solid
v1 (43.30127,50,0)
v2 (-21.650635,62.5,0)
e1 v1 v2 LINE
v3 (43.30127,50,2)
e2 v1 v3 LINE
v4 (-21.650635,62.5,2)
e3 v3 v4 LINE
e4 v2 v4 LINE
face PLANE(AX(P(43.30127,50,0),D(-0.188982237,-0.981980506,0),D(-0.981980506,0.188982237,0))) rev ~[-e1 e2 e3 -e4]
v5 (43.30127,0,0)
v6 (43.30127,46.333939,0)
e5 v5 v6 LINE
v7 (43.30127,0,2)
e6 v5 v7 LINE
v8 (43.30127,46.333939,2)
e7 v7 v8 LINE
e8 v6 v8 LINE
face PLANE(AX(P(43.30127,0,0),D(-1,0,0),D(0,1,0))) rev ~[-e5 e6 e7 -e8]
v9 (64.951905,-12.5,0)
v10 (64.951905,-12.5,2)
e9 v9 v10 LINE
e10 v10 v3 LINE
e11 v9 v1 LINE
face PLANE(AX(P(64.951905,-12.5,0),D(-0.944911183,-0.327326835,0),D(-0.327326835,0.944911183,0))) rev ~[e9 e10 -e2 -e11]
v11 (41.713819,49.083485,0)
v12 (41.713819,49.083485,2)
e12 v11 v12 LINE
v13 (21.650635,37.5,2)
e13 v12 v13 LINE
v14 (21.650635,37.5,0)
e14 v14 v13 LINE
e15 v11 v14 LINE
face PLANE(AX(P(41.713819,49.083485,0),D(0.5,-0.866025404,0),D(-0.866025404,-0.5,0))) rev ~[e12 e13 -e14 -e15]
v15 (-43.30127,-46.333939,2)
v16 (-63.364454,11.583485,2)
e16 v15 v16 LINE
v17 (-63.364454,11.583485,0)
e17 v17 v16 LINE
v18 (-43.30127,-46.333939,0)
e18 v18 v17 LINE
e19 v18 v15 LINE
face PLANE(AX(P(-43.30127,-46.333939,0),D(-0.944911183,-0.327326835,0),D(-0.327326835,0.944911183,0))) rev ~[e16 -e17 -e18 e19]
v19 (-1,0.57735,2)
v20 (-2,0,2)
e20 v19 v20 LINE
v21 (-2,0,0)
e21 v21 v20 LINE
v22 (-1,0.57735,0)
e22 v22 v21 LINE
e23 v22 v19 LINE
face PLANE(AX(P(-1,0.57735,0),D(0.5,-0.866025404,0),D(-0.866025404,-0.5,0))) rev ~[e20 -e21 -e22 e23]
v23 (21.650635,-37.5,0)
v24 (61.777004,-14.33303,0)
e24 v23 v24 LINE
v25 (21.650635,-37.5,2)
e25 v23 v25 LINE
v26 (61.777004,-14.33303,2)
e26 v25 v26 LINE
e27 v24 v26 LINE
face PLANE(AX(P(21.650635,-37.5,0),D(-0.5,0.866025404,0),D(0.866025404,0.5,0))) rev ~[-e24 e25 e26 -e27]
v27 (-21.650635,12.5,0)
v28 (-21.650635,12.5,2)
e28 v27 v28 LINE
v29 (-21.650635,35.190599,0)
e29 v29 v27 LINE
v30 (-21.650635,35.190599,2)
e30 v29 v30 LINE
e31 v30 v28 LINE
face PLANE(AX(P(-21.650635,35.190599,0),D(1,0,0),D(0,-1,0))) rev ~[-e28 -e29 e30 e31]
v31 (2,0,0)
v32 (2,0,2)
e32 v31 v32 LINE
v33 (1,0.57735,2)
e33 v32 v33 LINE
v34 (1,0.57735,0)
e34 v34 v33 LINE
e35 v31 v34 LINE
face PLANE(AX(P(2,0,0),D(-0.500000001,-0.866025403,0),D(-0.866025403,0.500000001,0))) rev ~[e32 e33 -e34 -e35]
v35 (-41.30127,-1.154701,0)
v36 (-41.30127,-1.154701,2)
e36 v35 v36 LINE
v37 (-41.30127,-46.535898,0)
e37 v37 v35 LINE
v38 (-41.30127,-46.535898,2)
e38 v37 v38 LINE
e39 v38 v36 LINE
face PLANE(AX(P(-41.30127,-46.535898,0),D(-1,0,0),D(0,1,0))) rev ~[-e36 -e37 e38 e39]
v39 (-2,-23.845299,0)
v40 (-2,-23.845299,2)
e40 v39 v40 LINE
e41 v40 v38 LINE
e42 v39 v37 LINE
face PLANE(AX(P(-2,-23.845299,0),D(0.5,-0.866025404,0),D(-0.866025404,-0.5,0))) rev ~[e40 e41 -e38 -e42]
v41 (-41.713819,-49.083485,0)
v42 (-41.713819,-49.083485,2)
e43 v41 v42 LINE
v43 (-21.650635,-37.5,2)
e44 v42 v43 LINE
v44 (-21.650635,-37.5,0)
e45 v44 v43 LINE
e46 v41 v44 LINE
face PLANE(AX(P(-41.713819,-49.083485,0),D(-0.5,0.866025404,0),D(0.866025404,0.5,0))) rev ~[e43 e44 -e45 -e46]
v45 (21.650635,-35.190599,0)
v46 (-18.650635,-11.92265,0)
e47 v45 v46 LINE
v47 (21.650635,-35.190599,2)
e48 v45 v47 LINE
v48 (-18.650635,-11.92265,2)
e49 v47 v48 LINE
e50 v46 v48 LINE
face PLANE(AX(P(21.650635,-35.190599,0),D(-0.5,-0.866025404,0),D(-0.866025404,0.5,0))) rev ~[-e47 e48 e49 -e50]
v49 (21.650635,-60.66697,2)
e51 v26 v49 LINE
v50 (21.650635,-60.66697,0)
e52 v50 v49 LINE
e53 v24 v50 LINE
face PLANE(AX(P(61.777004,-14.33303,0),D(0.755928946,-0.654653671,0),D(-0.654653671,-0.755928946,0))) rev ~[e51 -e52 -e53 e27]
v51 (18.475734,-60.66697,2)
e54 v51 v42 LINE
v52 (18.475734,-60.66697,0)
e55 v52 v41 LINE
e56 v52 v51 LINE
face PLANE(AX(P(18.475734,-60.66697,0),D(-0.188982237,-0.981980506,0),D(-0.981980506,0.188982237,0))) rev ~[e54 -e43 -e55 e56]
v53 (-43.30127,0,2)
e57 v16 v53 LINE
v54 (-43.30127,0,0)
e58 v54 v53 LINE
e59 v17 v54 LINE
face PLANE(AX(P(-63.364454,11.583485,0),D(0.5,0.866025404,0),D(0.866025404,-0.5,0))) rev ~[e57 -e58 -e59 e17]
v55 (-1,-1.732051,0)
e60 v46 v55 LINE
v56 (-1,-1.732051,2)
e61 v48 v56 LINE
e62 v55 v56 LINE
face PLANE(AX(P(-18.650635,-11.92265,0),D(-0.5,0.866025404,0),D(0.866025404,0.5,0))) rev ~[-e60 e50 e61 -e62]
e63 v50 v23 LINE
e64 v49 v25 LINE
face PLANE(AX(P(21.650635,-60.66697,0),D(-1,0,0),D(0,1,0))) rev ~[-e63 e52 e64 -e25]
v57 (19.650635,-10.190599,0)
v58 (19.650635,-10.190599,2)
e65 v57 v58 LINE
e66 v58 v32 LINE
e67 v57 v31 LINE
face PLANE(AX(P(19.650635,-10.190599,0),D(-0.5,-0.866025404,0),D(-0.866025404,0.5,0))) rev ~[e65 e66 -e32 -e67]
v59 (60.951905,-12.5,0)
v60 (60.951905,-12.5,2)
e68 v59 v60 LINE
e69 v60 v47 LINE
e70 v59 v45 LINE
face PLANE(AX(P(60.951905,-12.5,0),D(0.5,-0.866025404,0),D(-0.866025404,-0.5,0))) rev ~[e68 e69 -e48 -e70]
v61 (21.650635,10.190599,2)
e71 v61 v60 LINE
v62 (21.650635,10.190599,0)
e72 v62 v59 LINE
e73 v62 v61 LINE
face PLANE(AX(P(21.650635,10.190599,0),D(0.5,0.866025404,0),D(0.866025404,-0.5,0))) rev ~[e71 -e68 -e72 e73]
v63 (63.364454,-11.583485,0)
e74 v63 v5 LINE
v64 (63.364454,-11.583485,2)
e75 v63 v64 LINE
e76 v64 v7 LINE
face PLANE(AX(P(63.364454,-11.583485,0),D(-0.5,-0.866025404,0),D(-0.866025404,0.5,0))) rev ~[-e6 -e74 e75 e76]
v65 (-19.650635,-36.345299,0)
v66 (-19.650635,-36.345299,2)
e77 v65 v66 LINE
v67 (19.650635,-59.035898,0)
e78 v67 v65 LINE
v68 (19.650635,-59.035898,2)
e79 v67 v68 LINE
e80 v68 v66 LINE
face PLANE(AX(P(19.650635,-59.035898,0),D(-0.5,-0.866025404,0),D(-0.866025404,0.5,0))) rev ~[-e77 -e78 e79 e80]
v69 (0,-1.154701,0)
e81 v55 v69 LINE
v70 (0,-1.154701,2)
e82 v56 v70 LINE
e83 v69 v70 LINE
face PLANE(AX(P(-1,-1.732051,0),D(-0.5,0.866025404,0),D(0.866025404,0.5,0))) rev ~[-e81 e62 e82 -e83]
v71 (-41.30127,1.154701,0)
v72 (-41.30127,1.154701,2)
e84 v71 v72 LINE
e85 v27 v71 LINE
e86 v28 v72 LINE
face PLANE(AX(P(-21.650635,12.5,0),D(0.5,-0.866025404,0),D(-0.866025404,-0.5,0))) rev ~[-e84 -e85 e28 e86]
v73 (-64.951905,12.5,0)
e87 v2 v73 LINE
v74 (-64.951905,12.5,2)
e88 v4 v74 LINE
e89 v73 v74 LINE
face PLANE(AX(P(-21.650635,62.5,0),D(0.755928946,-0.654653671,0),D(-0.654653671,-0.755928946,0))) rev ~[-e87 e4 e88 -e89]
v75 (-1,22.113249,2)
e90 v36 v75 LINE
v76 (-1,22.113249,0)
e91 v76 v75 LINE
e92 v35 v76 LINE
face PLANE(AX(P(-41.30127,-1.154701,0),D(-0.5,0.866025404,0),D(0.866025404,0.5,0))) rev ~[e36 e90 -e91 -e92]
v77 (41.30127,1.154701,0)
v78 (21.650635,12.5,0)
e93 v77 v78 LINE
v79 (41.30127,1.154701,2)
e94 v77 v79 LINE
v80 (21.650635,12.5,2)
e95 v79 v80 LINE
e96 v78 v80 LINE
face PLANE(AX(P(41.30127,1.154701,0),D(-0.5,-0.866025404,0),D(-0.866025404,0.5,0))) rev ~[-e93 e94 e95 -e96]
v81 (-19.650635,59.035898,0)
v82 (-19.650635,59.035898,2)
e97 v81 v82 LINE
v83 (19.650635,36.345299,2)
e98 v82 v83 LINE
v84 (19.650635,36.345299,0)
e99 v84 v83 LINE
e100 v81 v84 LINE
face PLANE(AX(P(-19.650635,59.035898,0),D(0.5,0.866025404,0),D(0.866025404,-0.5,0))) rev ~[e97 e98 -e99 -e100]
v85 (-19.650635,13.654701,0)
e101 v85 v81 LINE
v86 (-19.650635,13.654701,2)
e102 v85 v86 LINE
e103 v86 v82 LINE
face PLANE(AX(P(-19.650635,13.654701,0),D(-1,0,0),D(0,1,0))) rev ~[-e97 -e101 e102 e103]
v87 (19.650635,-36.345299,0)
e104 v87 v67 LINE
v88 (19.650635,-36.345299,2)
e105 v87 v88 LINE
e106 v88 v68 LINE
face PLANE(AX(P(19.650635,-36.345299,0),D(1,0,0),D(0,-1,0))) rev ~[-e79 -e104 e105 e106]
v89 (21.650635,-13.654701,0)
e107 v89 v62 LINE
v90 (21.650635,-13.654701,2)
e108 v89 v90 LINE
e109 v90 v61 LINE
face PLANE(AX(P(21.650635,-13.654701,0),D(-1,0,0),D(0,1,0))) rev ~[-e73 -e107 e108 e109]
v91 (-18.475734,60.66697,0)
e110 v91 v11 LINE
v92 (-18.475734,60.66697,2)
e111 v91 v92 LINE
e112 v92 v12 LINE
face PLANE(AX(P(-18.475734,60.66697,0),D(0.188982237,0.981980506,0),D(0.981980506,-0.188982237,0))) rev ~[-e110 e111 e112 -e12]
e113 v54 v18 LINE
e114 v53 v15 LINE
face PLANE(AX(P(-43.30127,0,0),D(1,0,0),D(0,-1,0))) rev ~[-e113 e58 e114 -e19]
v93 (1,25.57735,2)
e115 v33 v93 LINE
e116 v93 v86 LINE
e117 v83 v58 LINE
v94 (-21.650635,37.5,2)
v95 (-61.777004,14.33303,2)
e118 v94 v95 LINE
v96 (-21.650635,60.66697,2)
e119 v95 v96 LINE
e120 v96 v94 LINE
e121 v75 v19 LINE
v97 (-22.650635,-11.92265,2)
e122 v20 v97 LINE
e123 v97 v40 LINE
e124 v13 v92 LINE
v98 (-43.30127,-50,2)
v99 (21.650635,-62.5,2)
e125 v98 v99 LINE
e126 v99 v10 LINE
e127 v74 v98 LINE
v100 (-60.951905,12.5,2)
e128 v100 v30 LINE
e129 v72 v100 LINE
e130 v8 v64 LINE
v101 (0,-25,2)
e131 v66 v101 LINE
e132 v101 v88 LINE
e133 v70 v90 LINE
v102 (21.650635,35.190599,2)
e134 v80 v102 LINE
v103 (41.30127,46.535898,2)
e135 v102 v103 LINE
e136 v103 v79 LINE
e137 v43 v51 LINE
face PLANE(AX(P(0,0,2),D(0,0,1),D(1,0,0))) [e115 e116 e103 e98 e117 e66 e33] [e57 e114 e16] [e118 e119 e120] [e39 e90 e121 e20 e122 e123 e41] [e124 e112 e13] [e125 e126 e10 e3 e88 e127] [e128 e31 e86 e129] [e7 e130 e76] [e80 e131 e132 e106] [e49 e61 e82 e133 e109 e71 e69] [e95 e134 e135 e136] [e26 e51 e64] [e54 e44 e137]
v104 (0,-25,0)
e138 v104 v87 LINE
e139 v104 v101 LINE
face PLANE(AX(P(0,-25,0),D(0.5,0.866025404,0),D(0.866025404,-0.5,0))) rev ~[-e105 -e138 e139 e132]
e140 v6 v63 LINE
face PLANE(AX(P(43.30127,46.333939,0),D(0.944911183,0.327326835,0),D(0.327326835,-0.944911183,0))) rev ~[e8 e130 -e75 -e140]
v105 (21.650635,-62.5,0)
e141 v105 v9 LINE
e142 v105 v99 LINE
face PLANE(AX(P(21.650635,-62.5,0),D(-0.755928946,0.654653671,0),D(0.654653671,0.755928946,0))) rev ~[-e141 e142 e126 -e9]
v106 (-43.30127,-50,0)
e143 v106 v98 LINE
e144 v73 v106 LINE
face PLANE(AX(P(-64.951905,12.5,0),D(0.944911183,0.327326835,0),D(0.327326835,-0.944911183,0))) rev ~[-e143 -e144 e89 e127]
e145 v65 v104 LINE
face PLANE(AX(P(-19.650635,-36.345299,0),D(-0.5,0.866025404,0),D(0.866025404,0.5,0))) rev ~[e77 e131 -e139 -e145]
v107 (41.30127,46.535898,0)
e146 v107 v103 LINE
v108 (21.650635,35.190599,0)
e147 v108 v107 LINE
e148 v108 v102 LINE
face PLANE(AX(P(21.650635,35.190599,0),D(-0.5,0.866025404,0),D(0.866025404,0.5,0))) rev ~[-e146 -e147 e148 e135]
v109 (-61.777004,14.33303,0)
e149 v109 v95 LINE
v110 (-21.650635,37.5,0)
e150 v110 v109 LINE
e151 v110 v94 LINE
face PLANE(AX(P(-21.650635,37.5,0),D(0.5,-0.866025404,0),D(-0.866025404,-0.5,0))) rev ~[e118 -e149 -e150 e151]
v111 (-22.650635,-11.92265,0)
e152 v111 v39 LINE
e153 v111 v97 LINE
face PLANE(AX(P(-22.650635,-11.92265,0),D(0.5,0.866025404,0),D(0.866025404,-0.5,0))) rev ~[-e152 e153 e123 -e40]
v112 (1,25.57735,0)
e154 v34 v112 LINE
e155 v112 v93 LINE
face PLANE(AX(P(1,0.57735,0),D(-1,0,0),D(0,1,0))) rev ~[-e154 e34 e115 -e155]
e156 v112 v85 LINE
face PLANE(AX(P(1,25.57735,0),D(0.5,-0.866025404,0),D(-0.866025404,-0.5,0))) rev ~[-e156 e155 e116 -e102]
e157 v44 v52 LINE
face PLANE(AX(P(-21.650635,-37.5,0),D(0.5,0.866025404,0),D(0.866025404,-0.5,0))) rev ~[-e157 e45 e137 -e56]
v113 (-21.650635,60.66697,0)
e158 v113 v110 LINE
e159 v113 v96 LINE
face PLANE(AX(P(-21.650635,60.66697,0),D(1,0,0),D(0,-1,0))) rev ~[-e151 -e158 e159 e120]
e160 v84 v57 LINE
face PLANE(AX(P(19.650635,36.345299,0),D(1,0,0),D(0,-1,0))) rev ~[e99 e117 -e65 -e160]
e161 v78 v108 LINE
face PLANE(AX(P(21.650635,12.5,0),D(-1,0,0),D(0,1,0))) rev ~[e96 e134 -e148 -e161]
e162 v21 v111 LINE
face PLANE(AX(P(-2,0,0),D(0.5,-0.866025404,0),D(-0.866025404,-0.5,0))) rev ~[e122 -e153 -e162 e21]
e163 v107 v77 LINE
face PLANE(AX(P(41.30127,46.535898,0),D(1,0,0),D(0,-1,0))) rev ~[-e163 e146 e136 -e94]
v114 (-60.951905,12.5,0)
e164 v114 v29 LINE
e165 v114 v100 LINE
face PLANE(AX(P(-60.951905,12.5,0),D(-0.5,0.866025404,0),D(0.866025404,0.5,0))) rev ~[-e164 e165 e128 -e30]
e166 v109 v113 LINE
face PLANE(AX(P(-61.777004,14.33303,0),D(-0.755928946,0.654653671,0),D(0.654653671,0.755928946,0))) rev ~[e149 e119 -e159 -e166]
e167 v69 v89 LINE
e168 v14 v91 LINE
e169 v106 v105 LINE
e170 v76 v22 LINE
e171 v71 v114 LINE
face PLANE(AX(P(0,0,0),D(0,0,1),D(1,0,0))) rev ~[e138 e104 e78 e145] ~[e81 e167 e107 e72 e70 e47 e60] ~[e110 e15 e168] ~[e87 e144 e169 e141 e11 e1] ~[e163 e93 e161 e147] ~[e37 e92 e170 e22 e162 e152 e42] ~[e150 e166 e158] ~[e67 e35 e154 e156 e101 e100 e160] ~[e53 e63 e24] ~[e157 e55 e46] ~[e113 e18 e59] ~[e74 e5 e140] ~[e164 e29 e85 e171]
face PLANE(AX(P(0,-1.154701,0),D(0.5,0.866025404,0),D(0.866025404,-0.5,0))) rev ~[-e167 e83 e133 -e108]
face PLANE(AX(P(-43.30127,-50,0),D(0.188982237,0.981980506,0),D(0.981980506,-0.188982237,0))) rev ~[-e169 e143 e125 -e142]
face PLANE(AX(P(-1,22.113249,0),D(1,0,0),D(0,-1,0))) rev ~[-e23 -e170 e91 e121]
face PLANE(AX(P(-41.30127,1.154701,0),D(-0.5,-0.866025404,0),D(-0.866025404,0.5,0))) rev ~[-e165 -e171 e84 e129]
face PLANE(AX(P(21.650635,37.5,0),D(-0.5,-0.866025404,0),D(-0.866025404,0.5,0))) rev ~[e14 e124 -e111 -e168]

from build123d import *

# Parameters (mm, degrees)
F1_DEPTH = 2


# Not quite as in the source:
# - a feature names something its author has since deleted; it is built from what else it names


with BuildPart() as f1:
    # F0 (on Top) → F1 (new body)
    with BuildSketch(Plane.XY):
        Polygon((63.5912331811, -12.2381385313), (63.3644544975, -11.5834848612), (43.3012701892, 0), (43.3012701892, 46.333939444), (42.3941554539, 48.9525541272), (41.7138194028, 49.0834848613), (21.6506350946, 37.5000000002), (-18.4757335211, 60.6669697221), (-21.1970777272, 61.1906926587), (-21.6506350946, 60.6669697224), (-21.6506350946, 37.5), (-61.7770037106, 14.333030278), (-63.591233181, 12.2381385317), (-63.3644544972, 11.583484861), (-43.3012701894, 1e-10), (-43.3012701894, -46.3339394428), (-42.3941554538, -48.9525541268), (-41.7138194016, -49.0834848611), (-21.6506350939, -37.5000000002), (18.4757335209, -60.6669697216), (21.1970777272, -61.1906926583), (21.6506350946, -60.666969722), (21.6506350946, -37.5), (61.7770037099, -14.3330302784), align=None)
        Polygon((19.6506350946, -36.3452994616), (19.6506350946, -59.0358983857), (-19.6506350948, -36.3452994623), (5e-10, -25.0000000003), align=None, mode=Mode.SUBTRACT)
        Polygon((-1.0000000004, 0.5773502687), (-1.9999999999, -2e-10), (-22.6506350946, -11.9226497308), (-1.9999999997, -23.8452994618), (-41.3012701889, -46.535898385), (-41.3012701889, -1.1547005386), (-1.0000000004, 22.1132486534), (-1.0000000004, 1.7320508071), align=None, mode=Mode.SUBTRACT)
        Polygon((21.6506350946, 10.1905989232), (60.9519052838, -12.5), (21.6506350946, -35.1905989232), (-18.6506350946, -11.9226497308), (-1, -1.7320508076), (0, -1.1547005384), (21.6506350946, -13.6547005384), align=None, mode=Mode.SUBTRACT)
        Polygon((-60.9519052838, 12.5), (-21.6506350946, 35.1905989232), (-21.6506350946, 12.5000000002), (-41.3012701894, 1.1547005385), align=None, mode=Mode.SUBTRACT)
        Polygon((19.6506350946, -10.1905989242), (2, -1e-09), (1.0000000005, 0.5773502699), (1.0000000005, 1.7320508081), (1.0000000005, 25.5773502697), (-19.6506350952, 13.6547005382), (-19.6506350952, 59.0358983854), (19.6506350946, 36.3452994618), align=None, mode=Mode.SUBTRACT)
        Polygon((21.6506350946, 35.1905989229), (41.3012701896, 46.5358983847), (41.3012701896, 1.1547005382), (21.6506350946, 12.5), align=None, mode=Mode.SUBTRACT)
        Polygon((-21.6506350946, 60.6669697224), (-21.6506350946, 62.5000000002), (-64.9519052838, 12.5), (-61.7770037106, 14.333030278), align=None)
        Polygon((41.7138194028, 49.0834848613), (43.3012701892, 50.0000000002), (-21.6506350948, 62.5000000001), (-18.4757335211, 60.6669697221), align=None)
        Polygon((-64.9519052838, 12.5), (-43.301270189, -50), (-43.3012701894, -46.3339394428), (-63.3644544972, 11.583484861), align=None)
        Polygon((-61.7770037106, 14.333030278), (-64.9519052838, 12.5), (-63.3644544972, 11.583484861), (-63.591233181, 12.2381385317), align=None)
        Polygon((-43.3012701894, -46.3339394428), (-43.3012701894, -50.0000000007), (-41.7138194016, -49.0834848611), (-42.3941554538, -48.9525541268), align=None)
        Polygon((-43.301270189, -50), (21.6506350949, -62.4999999997), (18.4757335209, -60.6669697216), (-41.7138194016, -49.0834848611), align=None)
        Polygon((18.4757335209, -60.6669697216), (21.6506350946, -62.4999999998), (21.6506350946, -60.666969722), (21.1970777272, -61.1906926583), align=None)
        Polygon((21.6506350949, -62.4999999997), (64.9519052839, -12.4999999995), (61.7770037099, -14.3330302784), (21.6506350946, -60.666969722), align=None)
        Polygon((61.7770037099, -14.3330302784), (64.9519052838, -12.5), (63.3644544975, -11.5834848612), (63.5912331811, -12.2381385313), align=None)
        Polygon((63.3644544975, -11.5834848612), (64.9519052838, -12.5), (43.3012701891, 50.0000000004), (43.3012701892, 46.333939444), align=None)
        Polygon((43.3012701892, 46.333939444), (43.3012701892, 50.0000000002), (41.7138194028, 49.0834848613), (42.3941554539, 48.9525541272), align=None)
        Polygon((-18.4757335211, 60.6669697221), (-21.6506350946, 62.5000000002), (-21.6506350946, 60.6669697224), (-21.1970777272, 61.1906926587), align=None)
    extrude(amount=F1_DEPTH)


solid = f1.part
